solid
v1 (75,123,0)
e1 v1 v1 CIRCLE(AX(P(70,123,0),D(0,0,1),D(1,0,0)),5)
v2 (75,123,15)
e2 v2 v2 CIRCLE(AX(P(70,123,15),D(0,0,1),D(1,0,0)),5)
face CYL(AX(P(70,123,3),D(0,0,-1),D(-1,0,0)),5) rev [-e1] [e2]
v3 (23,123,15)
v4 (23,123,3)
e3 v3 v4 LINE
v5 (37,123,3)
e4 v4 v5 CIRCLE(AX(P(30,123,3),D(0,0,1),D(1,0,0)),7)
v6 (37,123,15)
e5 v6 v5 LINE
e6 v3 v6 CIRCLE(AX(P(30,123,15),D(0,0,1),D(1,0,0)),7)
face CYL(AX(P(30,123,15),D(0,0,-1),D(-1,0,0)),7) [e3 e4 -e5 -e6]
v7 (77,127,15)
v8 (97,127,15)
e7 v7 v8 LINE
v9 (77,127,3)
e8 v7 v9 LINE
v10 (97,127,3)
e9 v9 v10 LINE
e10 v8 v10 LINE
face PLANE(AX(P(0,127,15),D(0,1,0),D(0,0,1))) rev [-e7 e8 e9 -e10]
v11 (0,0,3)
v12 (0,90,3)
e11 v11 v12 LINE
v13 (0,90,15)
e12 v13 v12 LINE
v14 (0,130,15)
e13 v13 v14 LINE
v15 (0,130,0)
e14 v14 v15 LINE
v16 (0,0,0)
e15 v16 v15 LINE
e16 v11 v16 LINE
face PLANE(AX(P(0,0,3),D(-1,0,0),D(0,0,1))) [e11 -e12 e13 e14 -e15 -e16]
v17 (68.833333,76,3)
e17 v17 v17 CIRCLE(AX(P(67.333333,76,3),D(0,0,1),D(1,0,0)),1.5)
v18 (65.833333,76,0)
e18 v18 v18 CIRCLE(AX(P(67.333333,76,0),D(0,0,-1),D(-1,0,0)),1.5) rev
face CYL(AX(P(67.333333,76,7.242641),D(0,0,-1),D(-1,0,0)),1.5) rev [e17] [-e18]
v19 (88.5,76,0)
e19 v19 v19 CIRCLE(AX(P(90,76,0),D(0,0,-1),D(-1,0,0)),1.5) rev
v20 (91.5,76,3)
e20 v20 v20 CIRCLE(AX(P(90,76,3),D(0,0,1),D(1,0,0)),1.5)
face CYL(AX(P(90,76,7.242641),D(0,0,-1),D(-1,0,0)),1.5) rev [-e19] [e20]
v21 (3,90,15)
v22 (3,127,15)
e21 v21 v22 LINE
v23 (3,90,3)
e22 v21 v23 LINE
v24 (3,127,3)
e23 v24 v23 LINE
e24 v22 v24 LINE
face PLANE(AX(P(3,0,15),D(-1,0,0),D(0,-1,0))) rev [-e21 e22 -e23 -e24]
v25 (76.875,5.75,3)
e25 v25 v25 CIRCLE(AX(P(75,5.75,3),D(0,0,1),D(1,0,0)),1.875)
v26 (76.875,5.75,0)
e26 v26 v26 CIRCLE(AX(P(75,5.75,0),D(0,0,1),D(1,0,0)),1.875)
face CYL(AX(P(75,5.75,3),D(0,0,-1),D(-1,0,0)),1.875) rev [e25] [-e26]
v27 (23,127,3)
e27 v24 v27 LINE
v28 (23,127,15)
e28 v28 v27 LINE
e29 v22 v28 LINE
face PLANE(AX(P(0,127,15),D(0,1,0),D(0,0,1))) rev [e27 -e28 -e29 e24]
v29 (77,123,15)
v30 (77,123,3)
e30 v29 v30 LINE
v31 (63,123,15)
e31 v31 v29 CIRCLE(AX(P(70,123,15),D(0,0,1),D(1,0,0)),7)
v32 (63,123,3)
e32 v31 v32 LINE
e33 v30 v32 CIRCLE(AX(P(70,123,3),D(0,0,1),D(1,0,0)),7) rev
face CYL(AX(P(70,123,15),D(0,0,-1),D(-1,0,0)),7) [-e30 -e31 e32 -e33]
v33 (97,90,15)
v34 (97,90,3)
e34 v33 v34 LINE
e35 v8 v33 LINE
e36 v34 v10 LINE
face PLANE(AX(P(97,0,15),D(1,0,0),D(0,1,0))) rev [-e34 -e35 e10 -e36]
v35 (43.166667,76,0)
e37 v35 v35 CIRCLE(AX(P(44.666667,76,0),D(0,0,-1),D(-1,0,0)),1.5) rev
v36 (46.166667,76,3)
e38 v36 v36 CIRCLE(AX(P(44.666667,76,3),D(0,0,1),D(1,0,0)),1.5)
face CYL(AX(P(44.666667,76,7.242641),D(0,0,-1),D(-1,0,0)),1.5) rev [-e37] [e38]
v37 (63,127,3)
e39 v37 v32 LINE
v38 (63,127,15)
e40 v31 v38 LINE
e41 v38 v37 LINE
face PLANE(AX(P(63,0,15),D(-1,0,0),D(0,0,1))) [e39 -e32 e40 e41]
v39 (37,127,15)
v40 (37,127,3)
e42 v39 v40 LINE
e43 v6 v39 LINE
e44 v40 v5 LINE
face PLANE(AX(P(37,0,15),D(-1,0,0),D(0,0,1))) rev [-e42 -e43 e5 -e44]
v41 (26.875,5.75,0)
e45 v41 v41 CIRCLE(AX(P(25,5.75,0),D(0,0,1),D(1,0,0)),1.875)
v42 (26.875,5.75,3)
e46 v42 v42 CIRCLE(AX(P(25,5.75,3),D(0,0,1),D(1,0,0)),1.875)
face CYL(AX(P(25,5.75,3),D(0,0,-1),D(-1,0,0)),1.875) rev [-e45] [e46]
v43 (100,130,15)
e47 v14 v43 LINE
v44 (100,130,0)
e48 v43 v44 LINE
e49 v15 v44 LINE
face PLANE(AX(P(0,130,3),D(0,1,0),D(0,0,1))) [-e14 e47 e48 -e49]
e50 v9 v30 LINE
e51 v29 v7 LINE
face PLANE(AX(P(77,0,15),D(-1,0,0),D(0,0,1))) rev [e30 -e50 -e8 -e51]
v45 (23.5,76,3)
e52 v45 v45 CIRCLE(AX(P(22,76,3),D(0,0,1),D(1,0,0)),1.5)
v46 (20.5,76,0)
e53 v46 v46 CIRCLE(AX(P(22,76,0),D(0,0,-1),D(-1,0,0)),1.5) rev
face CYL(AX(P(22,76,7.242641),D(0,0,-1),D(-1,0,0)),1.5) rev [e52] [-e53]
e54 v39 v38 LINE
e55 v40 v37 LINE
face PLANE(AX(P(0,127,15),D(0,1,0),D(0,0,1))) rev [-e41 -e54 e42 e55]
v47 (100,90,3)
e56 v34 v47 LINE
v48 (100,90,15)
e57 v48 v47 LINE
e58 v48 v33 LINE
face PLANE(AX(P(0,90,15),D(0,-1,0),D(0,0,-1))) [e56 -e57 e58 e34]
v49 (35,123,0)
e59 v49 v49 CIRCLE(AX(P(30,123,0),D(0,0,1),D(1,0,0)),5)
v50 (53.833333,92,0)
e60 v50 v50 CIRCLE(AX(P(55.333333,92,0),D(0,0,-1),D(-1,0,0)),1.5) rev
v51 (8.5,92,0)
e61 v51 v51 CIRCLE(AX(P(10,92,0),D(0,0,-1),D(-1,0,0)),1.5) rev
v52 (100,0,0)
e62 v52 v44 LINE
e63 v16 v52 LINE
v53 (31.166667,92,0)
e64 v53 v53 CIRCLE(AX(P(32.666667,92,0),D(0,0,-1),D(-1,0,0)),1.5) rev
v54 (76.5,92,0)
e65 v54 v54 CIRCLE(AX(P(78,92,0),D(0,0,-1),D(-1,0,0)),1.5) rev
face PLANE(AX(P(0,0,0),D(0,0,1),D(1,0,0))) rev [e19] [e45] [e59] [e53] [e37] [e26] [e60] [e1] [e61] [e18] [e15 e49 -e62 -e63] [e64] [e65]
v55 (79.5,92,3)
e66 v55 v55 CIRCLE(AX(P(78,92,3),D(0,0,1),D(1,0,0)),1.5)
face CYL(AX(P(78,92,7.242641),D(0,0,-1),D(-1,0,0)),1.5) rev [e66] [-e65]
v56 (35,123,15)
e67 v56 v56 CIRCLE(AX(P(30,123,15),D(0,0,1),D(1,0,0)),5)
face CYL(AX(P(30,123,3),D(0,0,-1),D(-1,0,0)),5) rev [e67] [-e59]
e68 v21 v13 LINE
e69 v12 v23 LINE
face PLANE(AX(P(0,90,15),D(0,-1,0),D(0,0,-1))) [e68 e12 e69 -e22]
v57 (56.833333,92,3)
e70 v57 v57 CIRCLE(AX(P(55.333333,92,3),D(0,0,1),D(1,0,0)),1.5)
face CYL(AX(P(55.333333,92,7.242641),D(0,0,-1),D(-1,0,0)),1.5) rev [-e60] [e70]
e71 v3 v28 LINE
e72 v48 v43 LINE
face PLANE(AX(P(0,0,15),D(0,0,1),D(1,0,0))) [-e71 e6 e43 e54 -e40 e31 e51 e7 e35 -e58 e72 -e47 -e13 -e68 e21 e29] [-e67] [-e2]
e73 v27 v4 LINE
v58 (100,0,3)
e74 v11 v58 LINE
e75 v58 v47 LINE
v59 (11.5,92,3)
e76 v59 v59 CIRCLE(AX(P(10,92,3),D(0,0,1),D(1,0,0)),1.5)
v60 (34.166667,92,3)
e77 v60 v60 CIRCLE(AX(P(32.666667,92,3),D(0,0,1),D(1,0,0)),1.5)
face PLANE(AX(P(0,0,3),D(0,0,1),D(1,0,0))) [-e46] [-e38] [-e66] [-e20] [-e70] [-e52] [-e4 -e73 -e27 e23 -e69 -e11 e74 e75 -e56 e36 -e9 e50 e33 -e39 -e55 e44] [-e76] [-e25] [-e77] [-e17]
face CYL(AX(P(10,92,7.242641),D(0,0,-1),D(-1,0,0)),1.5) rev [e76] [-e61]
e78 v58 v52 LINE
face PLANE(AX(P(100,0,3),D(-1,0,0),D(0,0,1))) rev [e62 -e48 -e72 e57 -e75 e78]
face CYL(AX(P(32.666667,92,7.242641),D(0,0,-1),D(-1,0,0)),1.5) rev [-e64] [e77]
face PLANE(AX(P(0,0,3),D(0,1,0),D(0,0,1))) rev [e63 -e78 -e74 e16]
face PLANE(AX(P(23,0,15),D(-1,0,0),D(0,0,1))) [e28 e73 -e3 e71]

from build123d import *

# Parameters (mm, degrees)
SKETCH1_R              = 1.875
SKETCH1_R_2            = 5
BOSS_EXTRUDE1_DEPTH    = 3
CUT_EXTRUDE1_OUTLINE_R = 1.5
CUT_EXTRUDE1_DEPTH     = 3
LPATTERN1_COUNT        = 4
LPATTERN1_PITCH        = 22.666666667
SKETCH1_4_W            = 20
SKETCH1_4_H            = 3
SKETCH1_4_W_2          = 26
BOSS_EXTRUDE2_DEPTH    = 15


# Read off the part's stored shape, not the designer's step: Cut-Extrude1
with BuildPart() as part:
    # Sketch1 → Boss-Extrude1 (new body)
    with BuildSketch(Plane.XY):
        Polygon((77, 130), (63, 130), (63, 127), (37, 127), (37, 130), (23, 130), (23, 127), (3, 127), (3, 130), (0, 130), (0, 0), (100, 0), (100, 130), (97, 130), (97, 127), (77, 127), align=None)
        with Locations((25, 5.75)):
            Circle(SKETCH1_R, mode=Mode.SUBTRACT)
        with Locations((75, 5.75)):
            Circle(SKETCH1_R, mode=Mode.SUBTRACT)
        with BuildLine():
            ThreePointArc((37, 123), (30, 116), (23, 123))
            Line((23, 123), (25, 123))
            ThreePointArc((25, 123), (30, 128), (35, 123))
            Line((35, 123), (37, 123))
        make_face(mode=Mode.SUBTRACT)
        with Locations((70, 123)):
            Circle(SKETCH1_R_2, mode=Mode.SUBTRACT)
    extrude(amount=BOSS_EXTRUDE1_DEPTH)

    # Cut-Extrude1 outline → Cut-Extrude1 (cut)
    with BuildSketch(Plane.XY):
        with Locations((22, 76)):
            Circle(CUT_EXTRUDE1_OUTLINE_R)
        with Locations((10, 92)):
            Circle(CUT_EXTRUDE1_OUTLINE_R)
    cut_extrude1 = extrude(amount=CUT_EXTRUDE1_DEPTH, mode=Mode.SUBTRACT)

    # LPattern1: Cut-Extrude1 ×4
    with Locations(*[(i * LPATTERN1_PITCH, 0, 0) for i in range(1, LPATTERN1_COUNT)]):
        add(cut_extrude1, mode=Mode.SUBTRACT)

    # Sketch1<4> → Boss-Extrude2 (add)
    with BuildSketch(Plane.XY):
        Polygon((0, 130), (0, 90), (3, 90), (3, 127), (3, 130), align=None)
        with Locations((13, 128.5)):
            Rectangle(SKETCH1_4_W, SKETCH1_4_H)
        Polygon((97, 90), (100, 90), (100, 130), (97, 130), (97, 127), align=None)
        with Locations((87, 128.5)):
            Rectangle(SKETCH1_4_W, SKETCH1_4_H)
        with BuildLine():
            Line((77, 127), (77, 130))
            Line((77, 130), (70, 130))
            ThreePointArc((70, 130), (74.949747468, 127.949747468), (77, 123))
            Line((77, 123), (77, 127))
        make_face()
        with BuildLine():
            ThreePointArc((63, 123), (65.050252532, 127.949747468), (70, 130))
            Line((70, 130), (63, 130))
            Line((63, 130), (63, 127))
            Line((63, 127), (63, 123))
        make_face()
        with BuildLine():
            ThreePointArc((77, 123), (74.949747468, 127.949747468), (70, 130))
            ThreePointArc((70, 130), (65.050252532, 127.949747468), (63, 123))
            Line((63, 123), (65, 123))
            ThreePointArc((65, 123), (70, 128), (75, 123))
            Line((75, 123), (77, 123))
        make_face()
        with BuildLine():
            ThreePointArc((63, 123), (70, 116), (77, 123))
            Line((77, 123), (75, 123))
            ThreePointArc((75, 123), (70, 118), (65, 123))
            Line((65, 123), (63, 123))
        make_face()
        with BuildLine():
            ThreePointArc((77, 123), (74.949747468, 127.949747468), (70, 130))
            ThreePointArc((70, 130), (65.050252532, 127.949747468), (63, 123))
            Line((63, 123), (65, 123))
            ThreePointArc((65, 123), (70, 128), (75, 123))
            Line((75, 123), (77, 123))
        make_face()
        with BuildLine():
            ThreePointArc((63, 123), (70, 116), (77, 123))
            Line((77, 123), (75, 123))
            ThreePointArc((75, 123), (70, 118), (65, 123))
            Line((65, 123), (63, 123))
        make_face()
        with Locations((50, 128.5)):
            Rectangle(SKETCH1_4_W_2, SKETCH1_4_H)
        with BuildLine():
            Line((37, 130), (30, 130))
            ThreePointArc((30, 130), (34.949747468, 127.949747468), (37, 123))
            Line((37, 123), (37, 127))
            Line((37, 127), (37, 130))
        make_face()
        with BuildLine():
            Line((30, 130), (23, 130))
            Line((23, 130), (23, 127))
            Line((23, 127), (23, 123))
            ThreePointArc((23, 123), (25.050252532, 127.949747468), (30, 130))
        make_face()
        with BuildLine():
            ThreePointArc((37, 123), (34.949747468, 127.949747468), (30, 130))
            ThreePointArc((30, 130), (25.050252532, 127.949747468), (23, 123))
            Line((23, 123), (25, 123))
            ThreePointArc((25, 123), (30, 128), (35, 123))
            Line((35, 123), (37, 123))
        make_face()
        with BuildLine():
            Line((25, 123), (23, 123))
            ThreePointArc((23, 123), (30, 116), (37, 123))
            Line((37, 123), (35, 123))
            ThreePointArc((35, 123), (30, 118), (25, 123))
        make_face()
        with BuildLine():
            ThreePointArc((37, 123), (34.949747468, 127.949747468), (30, 130))
            ThreePointArc((30, 130), (25.050252532, 127.949747468), (23, 123))
            Line((23, 123), (25, 123))
            ThreePointArc((25, 123), (30, 128), (35, 123))
            Line((35, 123), (37, 123))
        make_face()
        with BuildLine():
            Line((25, 123), (23, 123))
            ThreePointArc((23, 123), (30, 116), (37, 123))
            Line((37, 123), (35, 123))
            ThreePointArc((35, 123), (30, 118), (25, 123))
        make_face()
    extrude(amount=BOSS_EXTRUDE2_DEPTH)


solid = part.part
